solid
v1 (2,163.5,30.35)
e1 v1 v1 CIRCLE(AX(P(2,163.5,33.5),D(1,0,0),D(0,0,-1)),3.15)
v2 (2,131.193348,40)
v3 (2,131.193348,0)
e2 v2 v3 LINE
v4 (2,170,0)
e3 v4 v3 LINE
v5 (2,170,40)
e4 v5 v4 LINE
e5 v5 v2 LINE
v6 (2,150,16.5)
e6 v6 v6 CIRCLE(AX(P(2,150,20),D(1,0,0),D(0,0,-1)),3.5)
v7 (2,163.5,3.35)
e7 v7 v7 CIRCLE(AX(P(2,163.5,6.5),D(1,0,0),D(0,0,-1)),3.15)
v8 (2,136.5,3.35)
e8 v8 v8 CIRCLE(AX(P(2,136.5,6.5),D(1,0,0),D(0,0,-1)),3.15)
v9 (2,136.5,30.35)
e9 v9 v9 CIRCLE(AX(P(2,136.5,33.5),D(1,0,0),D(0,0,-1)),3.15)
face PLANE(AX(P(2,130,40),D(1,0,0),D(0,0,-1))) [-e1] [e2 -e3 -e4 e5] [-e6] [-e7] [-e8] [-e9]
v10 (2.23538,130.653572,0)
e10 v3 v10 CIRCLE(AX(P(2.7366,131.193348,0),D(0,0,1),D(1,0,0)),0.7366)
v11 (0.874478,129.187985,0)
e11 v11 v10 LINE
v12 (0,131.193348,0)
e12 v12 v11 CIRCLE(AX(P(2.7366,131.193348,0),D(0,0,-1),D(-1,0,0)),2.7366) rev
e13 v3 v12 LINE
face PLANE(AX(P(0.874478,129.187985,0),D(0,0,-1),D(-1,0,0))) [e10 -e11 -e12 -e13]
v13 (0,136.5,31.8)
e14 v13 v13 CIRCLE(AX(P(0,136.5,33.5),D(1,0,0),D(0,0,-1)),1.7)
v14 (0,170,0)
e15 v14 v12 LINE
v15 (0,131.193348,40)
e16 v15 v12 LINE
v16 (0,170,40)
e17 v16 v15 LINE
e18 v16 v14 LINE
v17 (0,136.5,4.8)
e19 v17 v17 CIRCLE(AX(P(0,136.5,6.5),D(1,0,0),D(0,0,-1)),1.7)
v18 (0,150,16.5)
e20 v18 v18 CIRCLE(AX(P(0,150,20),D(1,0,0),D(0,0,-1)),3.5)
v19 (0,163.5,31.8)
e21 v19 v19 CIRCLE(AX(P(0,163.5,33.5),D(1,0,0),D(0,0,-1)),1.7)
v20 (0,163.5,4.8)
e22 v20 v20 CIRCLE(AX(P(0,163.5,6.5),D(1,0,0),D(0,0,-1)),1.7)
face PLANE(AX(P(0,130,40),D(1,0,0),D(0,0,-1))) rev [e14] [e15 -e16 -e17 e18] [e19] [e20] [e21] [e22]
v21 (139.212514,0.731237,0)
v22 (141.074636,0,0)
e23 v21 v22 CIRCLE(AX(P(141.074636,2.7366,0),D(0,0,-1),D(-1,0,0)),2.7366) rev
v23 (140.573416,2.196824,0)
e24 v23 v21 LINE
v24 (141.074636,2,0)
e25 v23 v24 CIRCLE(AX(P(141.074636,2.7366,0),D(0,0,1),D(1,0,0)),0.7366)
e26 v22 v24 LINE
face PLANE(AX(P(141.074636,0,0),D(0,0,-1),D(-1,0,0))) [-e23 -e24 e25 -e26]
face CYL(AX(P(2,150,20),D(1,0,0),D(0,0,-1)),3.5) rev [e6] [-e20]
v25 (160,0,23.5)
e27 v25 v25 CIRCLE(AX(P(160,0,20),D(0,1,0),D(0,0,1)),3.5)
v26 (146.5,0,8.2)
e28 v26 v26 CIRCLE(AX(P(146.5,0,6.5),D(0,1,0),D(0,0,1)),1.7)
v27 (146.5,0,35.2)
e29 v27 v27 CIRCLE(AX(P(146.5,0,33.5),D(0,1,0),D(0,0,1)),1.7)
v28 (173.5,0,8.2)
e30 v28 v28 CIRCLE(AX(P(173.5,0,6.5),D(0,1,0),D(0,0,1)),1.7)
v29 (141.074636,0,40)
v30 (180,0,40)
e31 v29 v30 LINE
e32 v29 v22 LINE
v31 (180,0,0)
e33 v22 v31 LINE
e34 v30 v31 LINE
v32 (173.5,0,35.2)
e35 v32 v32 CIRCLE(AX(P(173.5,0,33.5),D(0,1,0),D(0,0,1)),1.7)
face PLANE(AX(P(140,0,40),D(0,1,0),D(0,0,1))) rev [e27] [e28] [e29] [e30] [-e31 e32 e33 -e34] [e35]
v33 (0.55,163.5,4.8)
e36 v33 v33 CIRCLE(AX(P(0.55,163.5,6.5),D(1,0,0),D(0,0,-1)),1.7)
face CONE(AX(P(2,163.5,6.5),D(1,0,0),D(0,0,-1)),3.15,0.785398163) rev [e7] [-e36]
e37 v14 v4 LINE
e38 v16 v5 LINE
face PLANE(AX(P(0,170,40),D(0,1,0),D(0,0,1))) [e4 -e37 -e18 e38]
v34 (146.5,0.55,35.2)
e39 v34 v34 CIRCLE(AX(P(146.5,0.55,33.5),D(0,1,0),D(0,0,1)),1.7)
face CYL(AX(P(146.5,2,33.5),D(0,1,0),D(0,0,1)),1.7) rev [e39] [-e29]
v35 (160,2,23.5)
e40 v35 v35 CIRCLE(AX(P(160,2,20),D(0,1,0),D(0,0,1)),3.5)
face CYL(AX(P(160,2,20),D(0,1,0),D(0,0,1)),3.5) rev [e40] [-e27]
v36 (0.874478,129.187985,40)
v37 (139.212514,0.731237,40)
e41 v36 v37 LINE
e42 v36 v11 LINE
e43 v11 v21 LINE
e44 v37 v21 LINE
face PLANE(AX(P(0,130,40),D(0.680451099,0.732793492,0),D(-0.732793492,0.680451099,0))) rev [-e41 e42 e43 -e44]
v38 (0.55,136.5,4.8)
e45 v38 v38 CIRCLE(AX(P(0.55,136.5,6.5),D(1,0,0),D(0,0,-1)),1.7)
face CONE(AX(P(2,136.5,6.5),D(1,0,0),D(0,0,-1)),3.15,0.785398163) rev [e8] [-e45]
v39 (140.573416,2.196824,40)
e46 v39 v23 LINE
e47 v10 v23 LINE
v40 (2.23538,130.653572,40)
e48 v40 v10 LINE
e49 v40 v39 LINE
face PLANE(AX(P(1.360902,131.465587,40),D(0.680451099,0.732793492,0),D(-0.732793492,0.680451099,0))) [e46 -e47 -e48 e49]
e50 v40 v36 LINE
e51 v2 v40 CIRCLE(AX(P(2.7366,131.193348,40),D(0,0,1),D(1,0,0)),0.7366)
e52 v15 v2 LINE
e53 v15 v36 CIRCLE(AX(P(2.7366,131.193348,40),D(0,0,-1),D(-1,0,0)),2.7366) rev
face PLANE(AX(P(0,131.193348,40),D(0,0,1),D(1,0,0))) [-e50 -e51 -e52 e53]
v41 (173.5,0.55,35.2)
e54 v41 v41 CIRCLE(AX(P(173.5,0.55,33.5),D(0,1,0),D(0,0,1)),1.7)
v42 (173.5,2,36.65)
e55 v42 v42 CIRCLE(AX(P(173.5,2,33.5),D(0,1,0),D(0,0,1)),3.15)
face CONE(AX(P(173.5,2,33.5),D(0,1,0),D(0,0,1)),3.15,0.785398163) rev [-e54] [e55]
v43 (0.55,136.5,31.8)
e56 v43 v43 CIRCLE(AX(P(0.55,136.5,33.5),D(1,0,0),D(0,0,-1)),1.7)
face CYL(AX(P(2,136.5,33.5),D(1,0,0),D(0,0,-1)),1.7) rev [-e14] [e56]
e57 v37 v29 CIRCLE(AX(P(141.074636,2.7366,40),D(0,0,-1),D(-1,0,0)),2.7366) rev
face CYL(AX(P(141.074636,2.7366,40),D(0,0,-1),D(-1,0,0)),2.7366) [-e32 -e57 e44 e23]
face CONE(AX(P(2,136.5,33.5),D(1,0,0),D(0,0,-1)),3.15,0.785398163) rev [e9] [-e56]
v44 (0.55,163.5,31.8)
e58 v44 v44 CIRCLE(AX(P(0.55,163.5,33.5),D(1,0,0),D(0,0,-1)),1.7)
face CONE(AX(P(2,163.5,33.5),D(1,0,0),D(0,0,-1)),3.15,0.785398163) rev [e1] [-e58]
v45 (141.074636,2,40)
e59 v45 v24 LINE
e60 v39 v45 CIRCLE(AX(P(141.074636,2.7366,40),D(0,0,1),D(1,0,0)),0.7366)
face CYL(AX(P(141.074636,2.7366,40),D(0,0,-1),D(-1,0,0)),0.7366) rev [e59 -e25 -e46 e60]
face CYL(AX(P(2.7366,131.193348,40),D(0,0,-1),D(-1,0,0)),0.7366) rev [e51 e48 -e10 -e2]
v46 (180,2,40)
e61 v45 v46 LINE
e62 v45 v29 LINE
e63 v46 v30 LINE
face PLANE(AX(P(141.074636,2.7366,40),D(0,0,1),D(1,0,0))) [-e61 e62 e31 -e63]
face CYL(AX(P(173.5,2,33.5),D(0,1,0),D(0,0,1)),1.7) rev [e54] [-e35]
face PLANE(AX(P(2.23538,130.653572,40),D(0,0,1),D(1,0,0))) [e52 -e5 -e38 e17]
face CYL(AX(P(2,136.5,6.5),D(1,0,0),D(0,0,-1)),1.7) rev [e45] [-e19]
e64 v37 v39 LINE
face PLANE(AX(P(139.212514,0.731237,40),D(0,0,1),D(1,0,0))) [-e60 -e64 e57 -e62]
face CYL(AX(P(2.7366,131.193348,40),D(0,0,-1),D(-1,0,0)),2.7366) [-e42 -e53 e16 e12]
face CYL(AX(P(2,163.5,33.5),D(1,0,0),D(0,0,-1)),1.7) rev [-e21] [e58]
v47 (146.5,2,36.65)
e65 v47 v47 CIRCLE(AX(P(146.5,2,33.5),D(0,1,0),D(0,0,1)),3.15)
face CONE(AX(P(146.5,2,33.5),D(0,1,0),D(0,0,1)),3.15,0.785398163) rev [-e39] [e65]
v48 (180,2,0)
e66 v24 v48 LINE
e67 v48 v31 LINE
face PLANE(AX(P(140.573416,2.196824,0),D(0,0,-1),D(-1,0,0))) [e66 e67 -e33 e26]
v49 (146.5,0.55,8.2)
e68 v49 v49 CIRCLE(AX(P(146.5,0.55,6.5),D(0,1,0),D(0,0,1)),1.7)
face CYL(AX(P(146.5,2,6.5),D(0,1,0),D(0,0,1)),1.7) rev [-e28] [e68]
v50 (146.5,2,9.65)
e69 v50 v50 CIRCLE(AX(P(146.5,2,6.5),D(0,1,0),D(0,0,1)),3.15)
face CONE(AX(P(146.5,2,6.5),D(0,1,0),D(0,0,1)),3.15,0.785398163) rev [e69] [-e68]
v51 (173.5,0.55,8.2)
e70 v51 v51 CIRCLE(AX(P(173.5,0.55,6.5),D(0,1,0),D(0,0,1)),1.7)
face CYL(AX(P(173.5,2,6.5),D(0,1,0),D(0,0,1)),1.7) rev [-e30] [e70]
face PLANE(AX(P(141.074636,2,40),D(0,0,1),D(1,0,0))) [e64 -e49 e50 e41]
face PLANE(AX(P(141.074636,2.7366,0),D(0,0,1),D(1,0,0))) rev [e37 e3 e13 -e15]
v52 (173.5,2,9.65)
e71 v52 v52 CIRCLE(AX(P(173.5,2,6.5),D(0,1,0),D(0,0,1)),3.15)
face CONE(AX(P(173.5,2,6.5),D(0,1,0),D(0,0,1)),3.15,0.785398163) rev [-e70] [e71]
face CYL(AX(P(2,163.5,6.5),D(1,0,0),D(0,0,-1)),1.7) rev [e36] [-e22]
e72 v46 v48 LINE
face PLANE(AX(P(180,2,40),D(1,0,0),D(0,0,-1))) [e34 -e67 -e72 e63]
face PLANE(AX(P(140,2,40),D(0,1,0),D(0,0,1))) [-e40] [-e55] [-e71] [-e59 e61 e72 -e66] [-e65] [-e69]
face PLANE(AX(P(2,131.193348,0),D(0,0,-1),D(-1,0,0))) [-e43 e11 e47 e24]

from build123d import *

# Parameters (mm, degrees)
SM_BASE_FLANGE_1_DEPTH              = 40
HOLE_WIZARD_M3_3_AT_2_COUNT         = 2
HOLE_WIZARD_M3_3_AT_2_PITCH         = 27
HOLE_WIZARD_M3_3_AT_3_COUNT         = 2
HOLE_WIZARD_M3_3_AT_3_PITCH         = 38.183766184
HOLE_WIZARD_M3_3_AT_4_COUNT         = 2
HOLE_WIZARD_M3_3_AT_4_PITCH         = 27
HOLE_WIZARD_M3_5_AT_2_COUNT         = 2
HOLE_WIZARD_M3_5_AT_2_PITCH         = 27
HOLE_WIZARD_M3_5_AT_3_COUNT         = 2
HOLE_WIZARD_M3_5_AT_3_PITCH         = 38.183766184
HOLE_WIZARD_M3_5_AT_4_COUNT         = 2
HOLE_WIZARD_M3_5_AT_4_PITCH         = 27
HOLE_WIZARD_7_0_7_1_D               = 7
HOLE_WIZARD_7_0_7_1_DEPTH           = 2
HOLE_WIZARD_7_0_7_1_TIP             = 2.103012167
HOLE_WIZARD_7_0_7_1_ON_FACE_2_D     = 7
HOLE_WIZARD_7_0_7_1_ON_FACE_2_DEPTH = 2
HOLE_WIZARD_7_0_7_1_ON_FACE_2_TIP   = 2.103012167


# Sheet-metal steps are written as plain solids
with BuildPart() as part:
    # Sketch 1 → 基材-凸緣1 (new body)
    with BuildSketch(Plane.XY):
        with BuildLine():
            Line((0, 170), (0, 131.193347828))
            ThreePointArc((0, 131.193347828), (0.228127962, 130.099479649), (0.874477521, 129.187985159))
            Line((0.874477521, 129.187985159), (139.212513644, 0.731237331))
            ThreePointArc((139.212513644, 0.731237331), (140.07436014, 0.189360804), (141.074636122, 0))
            Line((141.074636122, 0), (180, 0))
            Line((180, 0), (180, 2))
            Line((180, 2), (141.074636122, 2))
            ThreePointArc((141.074636122, 2), (140.805395719, 2.050969513), (140.573415842, 2.196824314))
            Line((140.573415842, 2.196824314), (2.23537972, 130.653572142))
            ThreePointArc((2.23537972, 130.653572142), (2.061404318, 130.898915576), (2, 131.193347828))
            Line((2, 131.193347828), (2, 170))
            Line((2, 170), (0, 170))
        make_face()
    extrude(amount=SM_BASE_FLANGE_1_DEPTH)

    # 草圖5 → M3 平錐坑頭螺釘的錐孔3 (revolve, cut)
    with BuildSketch(Plane(origin=(173.5, 2, 6.5), x_dir=(0, 0, 1), z_dir=(1, 0, 0))):
        Polygon((0, 0), (0, 2), (1.7, 2), (1.7, 1.45), (3.15, 0), align=None)
    hole_wizard_m3_3 = revolve(axis=Axis((173.5, 8.35, 6.5), (0, -1, 0)), mode=Mode.SUBTRACT)

    # M3 平錐坑頭螺釘的錐孔3 at 2: M3 平錐坑頭螺釘的錐孔3 ×2
    with Locations(*[(0, 0, i * HOLE_WIZARD_M3_3_AT_2_PITCH) for i in range(1, HOLE_WIZARD_M3_3_AT_2_COUNT)]):
        add(hole_wizard_m3_3, mode=Mode.SUBTRACT)

    # M3 平錐坑頭螺釘的錐孔3 at 3: M3 平錐坑頭螺釘的錐孔3 ×2
    with Locations(*[Vector(-0.7071067811865471, 0, 0.7071067811865479) * (i * HOLE_WIZARD_M3_3_AT_3_PITCH) for i in range(1, HOLE_WIZARD_M3_3_AT_3_COUNT)]):
        add(hole_wizard_m3_3, mode=Mode.SUBTRACT)

    # M3 平錐坑頭螺釘的錐孔3 at 4: M3 平錐坑頭螺釘的錐孔3 ×2
    with Locations(*[(-i * HOLE_WIZARD_M3_3_AT_4_PITCH, 0, 0) for i in range(1, HOLE_WIZARD_M3_3_AT_4_COUNT)]):
        add(hole_wizard_m3_3, mode=Mode.SUBTRACT)

    # 草圖9 → M3 平錐坑頭螺釘的錐孔5 (revolve, cut)
    with BuildSketch(Plane(origin=(2, 163.5, 6.5), x_dir=(0, 0, -1), z_dir=(0, 1, 0))):
        Polygon((0, 0), (0, 2), (1.7, 2), (1.7, 1.45), (3.15, 0), align=None)
    hole_wizard_m3_5 = revolve(axis=Axis((8.35, 163.5, 6.5), (-1, 0, 0)), mode=Mode.SUBTRACT)

    # M3 平錐坑頭螺釘的錐孔5 at 2: M3 平錐坑頭螺釘的錐孔5 ×2
    with Locations(*[(0, -i * HOLE_WIZARD_M3_5_AT_2_PITCH, 0) for i in range(1, HOLE_WIZARD_M3_5_AT_2_COUNT)]):
        add(hole_wizard_m3_5, mode=Mode.SUBTRACT)

    # M3 平錐坑頭螺釘的錐孔5 at 3: M3 平錐坑頭螺釘的錐孔5 ×2
    with Locations(*[Vector(0, -0.7071067811865476, 0.7071067811865476) * (i * HOLE_WIZARD_M3_5_AT_3_PITCH) for i in range(1, HOLE_WIZARD_M3_5_AT_3_COUNT)]):
        add(hole_wizard_m3_5, mode=Mode.SUBTRACT)

    # M3 平錐坑頭螺釘的錐孔5 at 4: M3 平錐坑頭螺釘的錐孔5 ×2
    with Locations(*[(0, 0, i * HOLE_WIZARD_M3_5_AT_4_PITCH) for i in range(1, HOLE_WIZARD_M3_5_AT_4_COUNT)]):
        add(hole_wizard_m3_5, mode=Mode.SUBTRACT)

    # Ø7.0 (7) 直徑孔1
    with Locations(Plane(origin=(2, 150, 20), x_dir=(0, 0, 1), z_dir=(1, 0, 0))):
        with Locations((0, 0)):
            Hole(HOLE_WIZARD_7_0_7_1_D / 2, depth=HOLE_WIZARD_7_0_7_1_DEPTH)
            with Locations((0, 0, -(HOLE_WIZARD_7_0_7_1_DEPTH + HOLE_WIZARD_7_0_7_1_TIP / 2))):  # 118° drill point
                Cone(0, HOLE_WIZARD_7_0_7_1_D / 2, HOLE_WIZARD_7_0_7_1_TIP, mode=Mode.SUBTRACT)

    # Ø7.0 (7) 直徑孔1 on face 2
    with Locations(Plane(origin=(160, 2, 20), x_dir=(0, 0, 1), z_dir=(0, 1, 0))):
        with Locations((0, 0)):
            Hole(HOLE_WIZARD_7_0_7_1_ON_FACE_2_D / 2, depth=HOLE_WIZARD_7_0_7_1_ON_FACE_2_DEPTH)
            with Locations((0, 0, -(HOLE_WIZARD_7_0_7_1_ON_FACE_2_DEPTH + HOLE_WIZARD_7_0_7_1_ON_FACE_2_TIP / 2))):  # 118° drill point
                Cone(0, HOLE_WIZARD_7_0_7_1_ON_FACE_2_D / 2, HOLE_WIZARD_7_0_7_1_ON_FACE_2_TIP, mode=Mode.SUBTRACT)


solid = part.part
